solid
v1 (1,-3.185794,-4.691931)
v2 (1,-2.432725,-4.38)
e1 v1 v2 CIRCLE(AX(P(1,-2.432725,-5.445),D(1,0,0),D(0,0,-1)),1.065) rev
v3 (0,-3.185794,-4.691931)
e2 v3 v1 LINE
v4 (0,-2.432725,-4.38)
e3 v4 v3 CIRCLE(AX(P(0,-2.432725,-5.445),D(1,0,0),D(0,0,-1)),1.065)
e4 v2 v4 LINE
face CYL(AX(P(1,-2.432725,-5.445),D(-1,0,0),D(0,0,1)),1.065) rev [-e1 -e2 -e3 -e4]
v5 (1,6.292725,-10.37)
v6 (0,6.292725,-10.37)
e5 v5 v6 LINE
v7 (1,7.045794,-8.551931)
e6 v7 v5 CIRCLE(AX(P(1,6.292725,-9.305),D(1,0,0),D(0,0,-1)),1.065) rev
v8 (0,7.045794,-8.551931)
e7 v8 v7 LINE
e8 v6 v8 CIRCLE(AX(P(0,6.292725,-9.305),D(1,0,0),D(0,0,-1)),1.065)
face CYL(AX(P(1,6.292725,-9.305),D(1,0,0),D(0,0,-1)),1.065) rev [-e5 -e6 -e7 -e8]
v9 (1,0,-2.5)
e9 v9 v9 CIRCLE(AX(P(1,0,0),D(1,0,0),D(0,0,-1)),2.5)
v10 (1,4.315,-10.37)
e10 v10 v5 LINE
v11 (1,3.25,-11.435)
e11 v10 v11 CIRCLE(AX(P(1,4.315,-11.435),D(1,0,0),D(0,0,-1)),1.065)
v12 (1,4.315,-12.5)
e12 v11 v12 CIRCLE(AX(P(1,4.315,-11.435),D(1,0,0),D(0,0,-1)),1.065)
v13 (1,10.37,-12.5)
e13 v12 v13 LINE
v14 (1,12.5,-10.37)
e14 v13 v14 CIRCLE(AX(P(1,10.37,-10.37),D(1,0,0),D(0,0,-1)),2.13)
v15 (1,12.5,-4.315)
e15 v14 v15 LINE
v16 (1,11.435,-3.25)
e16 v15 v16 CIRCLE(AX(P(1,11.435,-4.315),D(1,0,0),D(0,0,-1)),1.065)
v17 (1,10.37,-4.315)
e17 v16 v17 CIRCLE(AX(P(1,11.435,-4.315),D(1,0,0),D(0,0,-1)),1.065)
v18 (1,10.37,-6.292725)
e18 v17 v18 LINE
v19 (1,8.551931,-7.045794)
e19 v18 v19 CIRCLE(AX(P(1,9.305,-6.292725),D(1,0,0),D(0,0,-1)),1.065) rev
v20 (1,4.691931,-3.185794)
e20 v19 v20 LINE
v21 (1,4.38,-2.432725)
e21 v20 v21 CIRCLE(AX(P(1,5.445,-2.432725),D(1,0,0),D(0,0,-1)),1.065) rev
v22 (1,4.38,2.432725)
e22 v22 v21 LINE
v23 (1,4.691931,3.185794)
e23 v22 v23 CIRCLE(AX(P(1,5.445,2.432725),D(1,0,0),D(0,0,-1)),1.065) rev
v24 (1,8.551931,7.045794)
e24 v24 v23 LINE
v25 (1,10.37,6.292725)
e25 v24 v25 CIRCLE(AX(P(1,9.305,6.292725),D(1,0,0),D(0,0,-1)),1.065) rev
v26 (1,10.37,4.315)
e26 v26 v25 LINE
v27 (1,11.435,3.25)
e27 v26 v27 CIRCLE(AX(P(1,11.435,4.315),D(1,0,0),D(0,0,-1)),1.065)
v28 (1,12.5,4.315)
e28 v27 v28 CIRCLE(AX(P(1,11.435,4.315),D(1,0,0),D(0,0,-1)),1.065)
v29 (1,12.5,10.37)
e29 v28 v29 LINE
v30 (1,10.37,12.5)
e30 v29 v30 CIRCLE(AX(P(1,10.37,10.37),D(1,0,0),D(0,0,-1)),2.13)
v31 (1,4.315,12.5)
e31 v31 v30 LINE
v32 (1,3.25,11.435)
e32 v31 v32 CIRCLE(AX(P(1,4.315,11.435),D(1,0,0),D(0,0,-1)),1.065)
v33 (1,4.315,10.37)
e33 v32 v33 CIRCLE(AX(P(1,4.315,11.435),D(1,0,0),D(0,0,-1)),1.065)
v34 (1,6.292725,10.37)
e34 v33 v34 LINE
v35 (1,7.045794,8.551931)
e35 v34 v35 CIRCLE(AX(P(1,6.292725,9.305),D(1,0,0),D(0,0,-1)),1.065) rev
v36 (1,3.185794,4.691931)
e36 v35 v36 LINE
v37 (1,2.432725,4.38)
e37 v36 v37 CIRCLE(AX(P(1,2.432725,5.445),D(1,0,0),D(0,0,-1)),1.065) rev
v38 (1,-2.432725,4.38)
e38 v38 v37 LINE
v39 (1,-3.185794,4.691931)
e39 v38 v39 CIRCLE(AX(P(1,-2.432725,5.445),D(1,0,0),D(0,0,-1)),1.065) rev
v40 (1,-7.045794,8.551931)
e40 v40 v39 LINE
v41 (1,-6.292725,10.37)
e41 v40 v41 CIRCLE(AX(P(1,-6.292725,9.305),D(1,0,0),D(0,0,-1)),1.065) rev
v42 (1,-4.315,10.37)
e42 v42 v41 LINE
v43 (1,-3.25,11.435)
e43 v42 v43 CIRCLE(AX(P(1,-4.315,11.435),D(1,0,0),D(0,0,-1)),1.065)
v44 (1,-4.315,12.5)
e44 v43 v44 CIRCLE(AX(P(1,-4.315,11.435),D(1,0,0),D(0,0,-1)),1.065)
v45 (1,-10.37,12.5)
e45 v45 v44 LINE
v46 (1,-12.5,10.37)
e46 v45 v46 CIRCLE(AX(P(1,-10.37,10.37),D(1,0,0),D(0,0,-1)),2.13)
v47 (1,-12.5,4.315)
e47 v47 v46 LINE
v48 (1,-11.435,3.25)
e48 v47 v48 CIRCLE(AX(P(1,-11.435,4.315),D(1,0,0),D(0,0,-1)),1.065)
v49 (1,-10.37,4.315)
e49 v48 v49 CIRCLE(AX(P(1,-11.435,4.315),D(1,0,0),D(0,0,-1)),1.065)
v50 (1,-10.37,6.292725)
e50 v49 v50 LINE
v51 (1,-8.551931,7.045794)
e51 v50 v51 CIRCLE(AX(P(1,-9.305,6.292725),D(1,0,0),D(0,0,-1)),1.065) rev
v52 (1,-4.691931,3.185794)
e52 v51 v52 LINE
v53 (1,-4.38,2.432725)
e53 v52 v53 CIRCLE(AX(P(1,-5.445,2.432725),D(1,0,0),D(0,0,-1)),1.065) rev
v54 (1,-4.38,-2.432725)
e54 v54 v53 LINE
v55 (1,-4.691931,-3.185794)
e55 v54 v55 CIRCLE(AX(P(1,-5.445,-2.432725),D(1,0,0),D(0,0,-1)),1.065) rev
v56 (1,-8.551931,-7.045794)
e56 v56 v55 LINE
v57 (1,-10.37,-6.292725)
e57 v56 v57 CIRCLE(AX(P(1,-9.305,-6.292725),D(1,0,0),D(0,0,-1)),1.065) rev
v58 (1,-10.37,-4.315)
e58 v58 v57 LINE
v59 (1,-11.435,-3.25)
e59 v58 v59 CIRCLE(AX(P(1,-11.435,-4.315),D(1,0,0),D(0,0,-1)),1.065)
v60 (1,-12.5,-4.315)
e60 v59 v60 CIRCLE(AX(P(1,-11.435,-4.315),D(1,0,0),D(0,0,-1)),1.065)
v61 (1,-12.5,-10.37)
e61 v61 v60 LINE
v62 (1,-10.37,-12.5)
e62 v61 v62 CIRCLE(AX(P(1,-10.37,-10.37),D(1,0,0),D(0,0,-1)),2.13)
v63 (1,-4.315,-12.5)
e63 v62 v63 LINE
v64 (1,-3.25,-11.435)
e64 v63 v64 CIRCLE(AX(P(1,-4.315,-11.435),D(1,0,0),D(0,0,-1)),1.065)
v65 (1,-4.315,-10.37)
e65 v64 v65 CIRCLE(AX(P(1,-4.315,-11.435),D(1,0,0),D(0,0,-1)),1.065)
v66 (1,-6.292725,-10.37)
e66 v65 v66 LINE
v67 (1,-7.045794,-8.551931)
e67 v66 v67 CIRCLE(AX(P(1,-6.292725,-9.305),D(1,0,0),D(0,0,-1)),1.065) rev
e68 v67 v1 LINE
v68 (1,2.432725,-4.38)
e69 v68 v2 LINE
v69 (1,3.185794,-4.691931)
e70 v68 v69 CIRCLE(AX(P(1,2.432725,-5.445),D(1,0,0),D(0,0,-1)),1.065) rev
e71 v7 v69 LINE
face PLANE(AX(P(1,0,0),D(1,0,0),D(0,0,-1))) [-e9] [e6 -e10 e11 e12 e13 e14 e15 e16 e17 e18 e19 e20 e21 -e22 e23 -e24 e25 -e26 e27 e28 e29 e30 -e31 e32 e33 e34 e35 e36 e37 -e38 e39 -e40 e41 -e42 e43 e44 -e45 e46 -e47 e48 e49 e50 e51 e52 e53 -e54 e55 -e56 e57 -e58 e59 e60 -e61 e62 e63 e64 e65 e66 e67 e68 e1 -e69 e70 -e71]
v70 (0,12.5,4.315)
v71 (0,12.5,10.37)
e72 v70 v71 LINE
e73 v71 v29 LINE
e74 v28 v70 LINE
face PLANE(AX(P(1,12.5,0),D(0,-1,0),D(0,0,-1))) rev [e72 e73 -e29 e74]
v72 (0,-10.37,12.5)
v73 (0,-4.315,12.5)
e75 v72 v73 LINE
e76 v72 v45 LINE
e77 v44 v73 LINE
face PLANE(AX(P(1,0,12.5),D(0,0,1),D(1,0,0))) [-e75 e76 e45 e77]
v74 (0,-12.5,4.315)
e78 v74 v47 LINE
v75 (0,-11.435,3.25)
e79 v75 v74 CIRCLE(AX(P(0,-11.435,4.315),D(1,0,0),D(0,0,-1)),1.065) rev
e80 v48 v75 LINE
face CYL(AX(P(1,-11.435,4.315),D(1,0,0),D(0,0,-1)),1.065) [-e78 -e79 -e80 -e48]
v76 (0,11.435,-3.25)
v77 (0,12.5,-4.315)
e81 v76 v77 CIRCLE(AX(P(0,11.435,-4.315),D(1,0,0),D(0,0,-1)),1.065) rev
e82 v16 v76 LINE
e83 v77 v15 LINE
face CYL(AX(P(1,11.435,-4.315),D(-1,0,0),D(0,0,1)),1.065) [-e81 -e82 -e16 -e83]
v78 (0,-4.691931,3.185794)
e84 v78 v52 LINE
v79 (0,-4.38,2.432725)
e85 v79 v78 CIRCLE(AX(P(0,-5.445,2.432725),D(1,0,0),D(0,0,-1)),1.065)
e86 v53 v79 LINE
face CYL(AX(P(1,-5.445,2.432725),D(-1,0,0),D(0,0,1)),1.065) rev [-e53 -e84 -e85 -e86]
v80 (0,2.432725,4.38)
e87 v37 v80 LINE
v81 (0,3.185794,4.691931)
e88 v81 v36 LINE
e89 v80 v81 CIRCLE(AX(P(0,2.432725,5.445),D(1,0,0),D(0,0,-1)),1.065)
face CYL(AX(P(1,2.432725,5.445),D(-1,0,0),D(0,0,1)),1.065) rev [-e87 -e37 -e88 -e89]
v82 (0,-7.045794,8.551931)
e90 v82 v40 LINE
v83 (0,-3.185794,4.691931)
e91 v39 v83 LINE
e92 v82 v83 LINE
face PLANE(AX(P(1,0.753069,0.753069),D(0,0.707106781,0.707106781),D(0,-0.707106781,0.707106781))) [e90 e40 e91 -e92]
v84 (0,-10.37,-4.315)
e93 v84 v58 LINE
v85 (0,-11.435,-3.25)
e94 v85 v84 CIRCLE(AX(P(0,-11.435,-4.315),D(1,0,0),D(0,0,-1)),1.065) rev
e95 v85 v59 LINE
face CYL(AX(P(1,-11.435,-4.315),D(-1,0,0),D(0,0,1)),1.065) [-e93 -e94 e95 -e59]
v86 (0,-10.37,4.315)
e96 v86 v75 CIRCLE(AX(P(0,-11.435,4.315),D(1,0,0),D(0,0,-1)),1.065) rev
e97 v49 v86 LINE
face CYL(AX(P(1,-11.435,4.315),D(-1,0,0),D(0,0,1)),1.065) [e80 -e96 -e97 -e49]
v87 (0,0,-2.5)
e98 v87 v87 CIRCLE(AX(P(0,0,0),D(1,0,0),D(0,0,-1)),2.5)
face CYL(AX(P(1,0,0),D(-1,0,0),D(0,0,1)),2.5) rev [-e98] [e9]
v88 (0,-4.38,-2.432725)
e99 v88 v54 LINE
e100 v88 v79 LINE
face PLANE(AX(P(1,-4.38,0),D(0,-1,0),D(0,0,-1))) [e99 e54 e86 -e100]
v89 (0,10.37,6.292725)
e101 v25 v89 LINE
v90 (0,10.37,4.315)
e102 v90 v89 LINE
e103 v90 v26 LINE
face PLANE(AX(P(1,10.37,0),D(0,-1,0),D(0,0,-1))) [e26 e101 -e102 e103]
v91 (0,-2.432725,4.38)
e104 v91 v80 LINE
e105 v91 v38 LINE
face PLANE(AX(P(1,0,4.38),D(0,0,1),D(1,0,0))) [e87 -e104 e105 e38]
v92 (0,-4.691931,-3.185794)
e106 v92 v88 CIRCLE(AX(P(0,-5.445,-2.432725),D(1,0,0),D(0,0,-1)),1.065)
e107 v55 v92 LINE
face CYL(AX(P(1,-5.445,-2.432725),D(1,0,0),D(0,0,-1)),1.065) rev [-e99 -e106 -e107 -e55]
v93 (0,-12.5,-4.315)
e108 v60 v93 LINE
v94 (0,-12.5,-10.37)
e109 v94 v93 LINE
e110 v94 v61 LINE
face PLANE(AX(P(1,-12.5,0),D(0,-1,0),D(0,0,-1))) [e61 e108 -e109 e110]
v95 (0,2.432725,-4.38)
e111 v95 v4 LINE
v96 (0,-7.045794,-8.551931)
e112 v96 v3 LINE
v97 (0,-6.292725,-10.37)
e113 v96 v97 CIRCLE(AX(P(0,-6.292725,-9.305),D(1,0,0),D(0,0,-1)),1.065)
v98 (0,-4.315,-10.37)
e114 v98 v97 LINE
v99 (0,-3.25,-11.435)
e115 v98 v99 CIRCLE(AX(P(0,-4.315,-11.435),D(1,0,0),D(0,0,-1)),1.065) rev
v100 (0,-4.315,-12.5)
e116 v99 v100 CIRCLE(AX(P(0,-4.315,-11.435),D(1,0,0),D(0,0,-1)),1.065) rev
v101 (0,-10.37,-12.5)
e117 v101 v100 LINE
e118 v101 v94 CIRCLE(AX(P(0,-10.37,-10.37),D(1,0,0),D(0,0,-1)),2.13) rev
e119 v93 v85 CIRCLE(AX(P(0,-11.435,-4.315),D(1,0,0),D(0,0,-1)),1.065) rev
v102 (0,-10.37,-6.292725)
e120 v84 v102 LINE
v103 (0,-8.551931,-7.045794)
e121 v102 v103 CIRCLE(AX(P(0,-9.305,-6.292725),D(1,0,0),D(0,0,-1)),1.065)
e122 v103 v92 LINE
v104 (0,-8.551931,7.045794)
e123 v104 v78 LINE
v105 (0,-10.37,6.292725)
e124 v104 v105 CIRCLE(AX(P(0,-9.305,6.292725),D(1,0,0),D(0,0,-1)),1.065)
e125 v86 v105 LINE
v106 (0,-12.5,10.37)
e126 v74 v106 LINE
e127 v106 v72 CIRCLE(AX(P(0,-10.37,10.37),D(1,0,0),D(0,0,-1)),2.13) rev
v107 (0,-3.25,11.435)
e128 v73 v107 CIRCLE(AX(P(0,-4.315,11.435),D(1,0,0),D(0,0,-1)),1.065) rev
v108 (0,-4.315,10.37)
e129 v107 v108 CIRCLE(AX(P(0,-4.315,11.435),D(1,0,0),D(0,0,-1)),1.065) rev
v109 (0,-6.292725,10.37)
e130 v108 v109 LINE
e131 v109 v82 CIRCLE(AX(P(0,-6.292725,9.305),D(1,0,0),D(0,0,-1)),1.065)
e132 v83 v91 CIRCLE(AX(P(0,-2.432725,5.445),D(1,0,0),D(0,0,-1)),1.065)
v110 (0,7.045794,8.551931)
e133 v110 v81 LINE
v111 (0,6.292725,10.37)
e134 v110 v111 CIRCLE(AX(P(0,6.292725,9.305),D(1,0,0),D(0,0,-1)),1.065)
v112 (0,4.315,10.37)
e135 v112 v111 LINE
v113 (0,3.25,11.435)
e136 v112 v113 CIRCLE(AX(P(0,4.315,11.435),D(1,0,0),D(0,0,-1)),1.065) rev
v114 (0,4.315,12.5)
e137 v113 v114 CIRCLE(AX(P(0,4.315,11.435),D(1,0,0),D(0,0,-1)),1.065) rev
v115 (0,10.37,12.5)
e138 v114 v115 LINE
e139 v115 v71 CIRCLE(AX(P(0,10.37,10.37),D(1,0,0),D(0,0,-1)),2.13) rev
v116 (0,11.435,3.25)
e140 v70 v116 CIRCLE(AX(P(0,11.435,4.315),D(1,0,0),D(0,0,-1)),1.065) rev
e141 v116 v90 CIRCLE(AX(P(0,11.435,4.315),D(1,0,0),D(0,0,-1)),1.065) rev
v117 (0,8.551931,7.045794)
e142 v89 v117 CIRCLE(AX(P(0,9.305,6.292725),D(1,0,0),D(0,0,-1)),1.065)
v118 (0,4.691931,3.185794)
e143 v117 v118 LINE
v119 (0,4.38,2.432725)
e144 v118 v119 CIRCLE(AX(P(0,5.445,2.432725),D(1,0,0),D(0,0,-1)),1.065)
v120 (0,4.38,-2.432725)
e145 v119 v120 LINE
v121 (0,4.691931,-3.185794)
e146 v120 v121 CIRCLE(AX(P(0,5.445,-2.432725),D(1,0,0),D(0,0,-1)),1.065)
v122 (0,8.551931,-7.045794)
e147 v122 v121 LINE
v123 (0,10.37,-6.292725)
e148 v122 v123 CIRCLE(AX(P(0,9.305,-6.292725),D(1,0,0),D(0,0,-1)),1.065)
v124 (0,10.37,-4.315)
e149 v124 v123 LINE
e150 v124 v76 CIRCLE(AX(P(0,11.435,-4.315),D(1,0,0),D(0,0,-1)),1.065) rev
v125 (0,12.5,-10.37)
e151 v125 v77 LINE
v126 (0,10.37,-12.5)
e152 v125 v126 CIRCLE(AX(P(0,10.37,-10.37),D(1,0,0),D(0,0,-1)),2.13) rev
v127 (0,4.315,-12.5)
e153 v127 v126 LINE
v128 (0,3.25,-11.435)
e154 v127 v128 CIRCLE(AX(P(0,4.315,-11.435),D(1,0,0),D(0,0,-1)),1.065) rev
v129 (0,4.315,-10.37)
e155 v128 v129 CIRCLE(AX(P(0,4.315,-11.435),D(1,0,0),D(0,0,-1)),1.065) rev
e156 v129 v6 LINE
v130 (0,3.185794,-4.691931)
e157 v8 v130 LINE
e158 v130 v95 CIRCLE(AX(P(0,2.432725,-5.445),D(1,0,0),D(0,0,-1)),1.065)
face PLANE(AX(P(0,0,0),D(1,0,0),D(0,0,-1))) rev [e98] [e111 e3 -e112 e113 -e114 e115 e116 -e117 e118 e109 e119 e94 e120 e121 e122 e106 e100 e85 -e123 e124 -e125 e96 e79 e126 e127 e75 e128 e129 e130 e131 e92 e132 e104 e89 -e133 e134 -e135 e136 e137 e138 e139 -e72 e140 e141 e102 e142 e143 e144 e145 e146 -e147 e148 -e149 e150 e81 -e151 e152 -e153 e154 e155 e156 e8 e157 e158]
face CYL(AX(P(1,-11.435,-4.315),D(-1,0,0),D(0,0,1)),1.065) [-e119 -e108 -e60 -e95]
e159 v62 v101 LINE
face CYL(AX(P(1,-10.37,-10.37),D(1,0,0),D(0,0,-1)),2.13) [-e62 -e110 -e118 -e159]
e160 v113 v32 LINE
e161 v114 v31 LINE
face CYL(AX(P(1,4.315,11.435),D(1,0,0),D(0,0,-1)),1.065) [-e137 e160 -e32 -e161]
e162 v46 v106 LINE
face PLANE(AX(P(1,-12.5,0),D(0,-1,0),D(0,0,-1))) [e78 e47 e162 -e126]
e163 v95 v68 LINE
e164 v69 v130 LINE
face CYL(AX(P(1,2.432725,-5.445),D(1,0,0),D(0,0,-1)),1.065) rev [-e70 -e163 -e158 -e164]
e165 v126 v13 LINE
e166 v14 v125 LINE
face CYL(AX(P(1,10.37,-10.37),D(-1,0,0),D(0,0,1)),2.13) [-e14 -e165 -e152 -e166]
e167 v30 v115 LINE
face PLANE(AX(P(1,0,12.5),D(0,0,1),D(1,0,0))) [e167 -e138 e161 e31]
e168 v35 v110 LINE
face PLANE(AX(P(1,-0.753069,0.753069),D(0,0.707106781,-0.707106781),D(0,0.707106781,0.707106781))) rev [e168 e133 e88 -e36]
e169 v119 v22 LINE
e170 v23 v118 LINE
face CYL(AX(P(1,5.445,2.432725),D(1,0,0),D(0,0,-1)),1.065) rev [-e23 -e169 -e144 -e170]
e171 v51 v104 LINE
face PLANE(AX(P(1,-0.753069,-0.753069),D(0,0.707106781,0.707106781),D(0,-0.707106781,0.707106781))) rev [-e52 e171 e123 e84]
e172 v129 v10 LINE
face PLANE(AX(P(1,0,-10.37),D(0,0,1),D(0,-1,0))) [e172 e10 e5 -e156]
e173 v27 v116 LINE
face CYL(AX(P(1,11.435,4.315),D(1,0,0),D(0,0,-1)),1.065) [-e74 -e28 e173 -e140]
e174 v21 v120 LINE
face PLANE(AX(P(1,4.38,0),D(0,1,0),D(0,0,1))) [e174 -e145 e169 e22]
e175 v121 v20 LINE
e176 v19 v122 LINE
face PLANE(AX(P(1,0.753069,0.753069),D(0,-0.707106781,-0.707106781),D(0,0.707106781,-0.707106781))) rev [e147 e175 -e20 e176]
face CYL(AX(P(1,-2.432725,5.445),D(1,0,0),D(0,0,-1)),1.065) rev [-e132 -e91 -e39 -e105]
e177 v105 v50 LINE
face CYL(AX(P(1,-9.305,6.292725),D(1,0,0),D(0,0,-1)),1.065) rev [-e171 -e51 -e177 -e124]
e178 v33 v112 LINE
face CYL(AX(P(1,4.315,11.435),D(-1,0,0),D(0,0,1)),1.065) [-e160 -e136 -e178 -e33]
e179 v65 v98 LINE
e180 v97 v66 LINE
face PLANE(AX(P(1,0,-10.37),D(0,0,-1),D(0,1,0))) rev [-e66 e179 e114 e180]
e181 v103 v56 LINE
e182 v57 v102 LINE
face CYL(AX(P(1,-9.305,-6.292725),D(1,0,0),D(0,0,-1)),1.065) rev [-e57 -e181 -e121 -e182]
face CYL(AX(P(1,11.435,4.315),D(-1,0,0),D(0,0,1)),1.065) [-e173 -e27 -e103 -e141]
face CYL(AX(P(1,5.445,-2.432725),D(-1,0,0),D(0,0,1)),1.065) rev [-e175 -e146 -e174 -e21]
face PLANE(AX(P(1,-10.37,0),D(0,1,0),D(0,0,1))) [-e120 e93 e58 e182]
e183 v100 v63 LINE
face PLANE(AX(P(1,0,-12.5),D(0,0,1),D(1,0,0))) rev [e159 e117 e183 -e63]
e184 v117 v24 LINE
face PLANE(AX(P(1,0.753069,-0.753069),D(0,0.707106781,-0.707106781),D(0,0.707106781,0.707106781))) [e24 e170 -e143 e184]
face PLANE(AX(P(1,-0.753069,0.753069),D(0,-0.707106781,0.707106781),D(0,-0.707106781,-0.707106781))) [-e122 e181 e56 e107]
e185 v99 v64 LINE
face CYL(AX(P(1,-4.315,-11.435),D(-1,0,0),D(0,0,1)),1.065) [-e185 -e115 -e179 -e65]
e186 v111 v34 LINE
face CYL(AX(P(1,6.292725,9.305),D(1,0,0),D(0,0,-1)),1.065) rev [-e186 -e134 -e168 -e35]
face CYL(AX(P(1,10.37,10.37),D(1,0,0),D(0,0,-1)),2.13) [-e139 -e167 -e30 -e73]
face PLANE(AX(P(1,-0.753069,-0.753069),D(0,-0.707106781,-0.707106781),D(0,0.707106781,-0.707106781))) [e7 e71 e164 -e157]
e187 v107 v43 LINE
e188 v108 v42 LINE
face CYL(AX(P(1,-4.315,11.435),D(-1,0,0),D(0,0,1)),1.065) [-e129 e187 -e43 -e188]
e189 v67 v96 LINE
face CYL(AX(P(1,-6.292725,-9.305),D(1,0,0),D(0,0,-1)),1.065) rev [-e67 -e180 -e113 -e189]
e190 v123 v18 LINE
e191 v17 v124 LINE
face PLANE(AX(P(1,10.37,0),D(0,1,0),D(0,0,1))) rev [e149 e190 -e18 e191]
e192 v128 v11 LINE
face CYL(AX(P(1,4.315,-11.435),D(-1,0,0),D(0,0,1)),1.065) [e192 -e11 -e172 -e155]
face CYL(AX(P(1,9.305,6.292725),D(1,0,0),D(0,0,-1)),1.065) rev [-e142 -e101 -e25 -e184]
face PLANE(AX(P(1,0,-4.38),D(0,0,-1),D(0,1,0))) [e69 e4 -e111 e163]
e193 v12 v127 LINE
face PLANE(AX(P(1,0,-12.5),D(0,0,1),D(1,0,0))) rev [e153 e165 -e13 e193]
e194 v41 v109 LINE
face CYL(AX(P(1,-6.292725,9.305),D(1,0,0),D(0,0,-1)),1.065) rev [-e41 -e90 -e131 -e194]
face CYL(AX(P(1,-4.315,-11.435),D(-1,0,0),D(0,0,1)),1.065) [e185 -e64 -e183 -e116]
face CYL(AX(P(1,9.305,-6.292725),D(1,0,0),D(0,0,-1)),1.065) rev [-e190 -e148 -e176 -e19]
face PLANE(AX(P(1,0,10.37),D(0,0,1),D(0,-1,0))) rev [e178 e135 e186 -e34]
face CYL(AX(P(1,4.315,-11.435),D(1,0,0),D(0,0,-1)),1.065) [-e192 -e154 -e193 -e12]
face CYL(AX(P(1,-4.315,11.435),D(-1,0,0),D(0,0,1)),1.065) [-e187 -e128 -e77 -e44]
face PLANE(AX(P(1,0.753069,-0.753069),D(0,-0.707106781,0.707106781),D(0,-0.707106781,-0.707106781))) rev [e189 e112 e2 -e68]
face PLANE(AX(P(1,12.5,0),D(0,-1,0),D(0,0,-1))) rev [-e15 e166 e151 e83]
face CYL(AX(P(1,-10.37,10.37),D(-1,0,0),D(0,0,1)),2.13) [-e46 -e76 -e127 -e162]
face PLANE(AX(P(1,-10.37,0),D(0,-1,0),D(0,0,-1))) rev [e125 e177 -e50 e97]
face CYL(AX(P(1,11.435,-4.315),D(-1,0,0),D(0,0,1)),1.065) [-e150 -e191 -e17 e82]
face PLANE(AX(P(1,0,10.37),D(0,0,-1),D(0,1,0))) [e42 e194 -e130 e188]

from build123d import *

# Parameters (mm, degrees)
SKETCH1_R           = 2.5
BOSS_EXTRUDE1_DEPTH = 1
FILLET1_R           = 1.065
FILLET2_R           = 2.13


with BuildPart() as part:
    # Sketch1 → Boss-Extrude1 (new body)
    with BuildSketch(Plane.YZ):
        Polygon((-12.5, -3.25), (-12.5, -12.5), (-3.25, -12.5), (-3.25, -10.37), (-8.863862556, -10.37), (-2.873862556, -4.38), (2.873862556, -4.38), (8.863862556, -10.37), (3.25, -10.37), (3.25, -12.5), (12.5, -12.5), (12.5, -3.25), (10.37, -3.25), (10.37, -8.863862556), (4.38, -2.873862556), (4.38, 2.873862556), (10.37, 8.863862556), (10.37, 3.25), (12.5, 3.25), (12.5, 12.5), (3.25, 12.5), (3.25, 10.37), (8.863862556, 10.37), (2.873862556, 4.38), (-2.873862556, 4.38), (-8.863862556, 10.37), (-3.25, 10.37), (-3.25, 12.5), (-12.5, 12.5), (-12.5, 3.25), (-10.37, 3.25), (-10.37, 8.863862556), (-4.38, 2.873862556), (-4.38, -2.873862556), (-10.37, -8.863862556), (-10.37, -3.25), align=None)
        with Locations(Location((0, 0, 0), (0, 0, 270))):
            Circle(SKETCH1_R, mode=Mode.SUBTRACT)
    extrude(amount=BOSS_EXTRUDE1_DEPTH)

    # Fillet1
    fillet1_edges = [part.edges().sort_by_distance(p)[0] for p in [
        (0.5, -10.37, -8.863862556),
        (0.5, 2.873862556, -4.38),
        (0.5, -2.873862556, -4.38),
        (0.5, -4.38, 2.873862556),
        (0.5, -4.38, -2.873862556),
        (0.5, -2.873862556, 4.38),
        (0.5, 2.873862556, 4.38),
        (0.5, 4.38, 2.873862556),
        (0.5, 4.38, -2.873862556),
        (0.5, -8.863862556, -10.37),
        (0.5, 8.863862556, -10.37),
        (0.5, 10.37, -8.863862556),
        (0.5, -10.37, 8.863862556),
        (0.5, -8.863862556, 10.37),
        (0.5, 10.37, 8.863862556),
        (0.5, 8.863862556, 10.37),
        (0.5, 12.5, 3.25),
        (0.5, -3.25, -12.5),
        (0.5, -10.37, 3.25),
        (0.5, 10.37, 3.25),
        (0.5, -10.37, -3.25),
        (0.5, -12.5, -3.25),
        (0.5, -12.5, 3.25),
        (0.5, 3.25, -10.37),
        (0.5, -3.25, -10.37),
        (0.5, 3.25, -12.5),
        (0.5, 10.37, -3.25),
        (0.5, 12.5, -3.25),
        (0.5, 3.25, 12.5),
        (0.5, 3.25, 10.37),
        (0.5, -3.25, 10.37),
        (0.5, -3.25, 12.5),
    ]]
    fillet(fillet1_edges, radius=FILLET1_R - 0.0001)  # a hair under: the kernel refuses the full size

    # Fillet2
    fillet2_edges = [part.edges().sort_by_distance(p)[0] for p in [
        (0.5, -12.5, 12.5),
        (0.5, 12.5, 12.5),
        (0.5, 12.5, -12.5),
        (0.5, -12.5, -12.5),
    ]]
    fillet(fillet2_edges, radius=FILLET2_R)


solid = part.part
